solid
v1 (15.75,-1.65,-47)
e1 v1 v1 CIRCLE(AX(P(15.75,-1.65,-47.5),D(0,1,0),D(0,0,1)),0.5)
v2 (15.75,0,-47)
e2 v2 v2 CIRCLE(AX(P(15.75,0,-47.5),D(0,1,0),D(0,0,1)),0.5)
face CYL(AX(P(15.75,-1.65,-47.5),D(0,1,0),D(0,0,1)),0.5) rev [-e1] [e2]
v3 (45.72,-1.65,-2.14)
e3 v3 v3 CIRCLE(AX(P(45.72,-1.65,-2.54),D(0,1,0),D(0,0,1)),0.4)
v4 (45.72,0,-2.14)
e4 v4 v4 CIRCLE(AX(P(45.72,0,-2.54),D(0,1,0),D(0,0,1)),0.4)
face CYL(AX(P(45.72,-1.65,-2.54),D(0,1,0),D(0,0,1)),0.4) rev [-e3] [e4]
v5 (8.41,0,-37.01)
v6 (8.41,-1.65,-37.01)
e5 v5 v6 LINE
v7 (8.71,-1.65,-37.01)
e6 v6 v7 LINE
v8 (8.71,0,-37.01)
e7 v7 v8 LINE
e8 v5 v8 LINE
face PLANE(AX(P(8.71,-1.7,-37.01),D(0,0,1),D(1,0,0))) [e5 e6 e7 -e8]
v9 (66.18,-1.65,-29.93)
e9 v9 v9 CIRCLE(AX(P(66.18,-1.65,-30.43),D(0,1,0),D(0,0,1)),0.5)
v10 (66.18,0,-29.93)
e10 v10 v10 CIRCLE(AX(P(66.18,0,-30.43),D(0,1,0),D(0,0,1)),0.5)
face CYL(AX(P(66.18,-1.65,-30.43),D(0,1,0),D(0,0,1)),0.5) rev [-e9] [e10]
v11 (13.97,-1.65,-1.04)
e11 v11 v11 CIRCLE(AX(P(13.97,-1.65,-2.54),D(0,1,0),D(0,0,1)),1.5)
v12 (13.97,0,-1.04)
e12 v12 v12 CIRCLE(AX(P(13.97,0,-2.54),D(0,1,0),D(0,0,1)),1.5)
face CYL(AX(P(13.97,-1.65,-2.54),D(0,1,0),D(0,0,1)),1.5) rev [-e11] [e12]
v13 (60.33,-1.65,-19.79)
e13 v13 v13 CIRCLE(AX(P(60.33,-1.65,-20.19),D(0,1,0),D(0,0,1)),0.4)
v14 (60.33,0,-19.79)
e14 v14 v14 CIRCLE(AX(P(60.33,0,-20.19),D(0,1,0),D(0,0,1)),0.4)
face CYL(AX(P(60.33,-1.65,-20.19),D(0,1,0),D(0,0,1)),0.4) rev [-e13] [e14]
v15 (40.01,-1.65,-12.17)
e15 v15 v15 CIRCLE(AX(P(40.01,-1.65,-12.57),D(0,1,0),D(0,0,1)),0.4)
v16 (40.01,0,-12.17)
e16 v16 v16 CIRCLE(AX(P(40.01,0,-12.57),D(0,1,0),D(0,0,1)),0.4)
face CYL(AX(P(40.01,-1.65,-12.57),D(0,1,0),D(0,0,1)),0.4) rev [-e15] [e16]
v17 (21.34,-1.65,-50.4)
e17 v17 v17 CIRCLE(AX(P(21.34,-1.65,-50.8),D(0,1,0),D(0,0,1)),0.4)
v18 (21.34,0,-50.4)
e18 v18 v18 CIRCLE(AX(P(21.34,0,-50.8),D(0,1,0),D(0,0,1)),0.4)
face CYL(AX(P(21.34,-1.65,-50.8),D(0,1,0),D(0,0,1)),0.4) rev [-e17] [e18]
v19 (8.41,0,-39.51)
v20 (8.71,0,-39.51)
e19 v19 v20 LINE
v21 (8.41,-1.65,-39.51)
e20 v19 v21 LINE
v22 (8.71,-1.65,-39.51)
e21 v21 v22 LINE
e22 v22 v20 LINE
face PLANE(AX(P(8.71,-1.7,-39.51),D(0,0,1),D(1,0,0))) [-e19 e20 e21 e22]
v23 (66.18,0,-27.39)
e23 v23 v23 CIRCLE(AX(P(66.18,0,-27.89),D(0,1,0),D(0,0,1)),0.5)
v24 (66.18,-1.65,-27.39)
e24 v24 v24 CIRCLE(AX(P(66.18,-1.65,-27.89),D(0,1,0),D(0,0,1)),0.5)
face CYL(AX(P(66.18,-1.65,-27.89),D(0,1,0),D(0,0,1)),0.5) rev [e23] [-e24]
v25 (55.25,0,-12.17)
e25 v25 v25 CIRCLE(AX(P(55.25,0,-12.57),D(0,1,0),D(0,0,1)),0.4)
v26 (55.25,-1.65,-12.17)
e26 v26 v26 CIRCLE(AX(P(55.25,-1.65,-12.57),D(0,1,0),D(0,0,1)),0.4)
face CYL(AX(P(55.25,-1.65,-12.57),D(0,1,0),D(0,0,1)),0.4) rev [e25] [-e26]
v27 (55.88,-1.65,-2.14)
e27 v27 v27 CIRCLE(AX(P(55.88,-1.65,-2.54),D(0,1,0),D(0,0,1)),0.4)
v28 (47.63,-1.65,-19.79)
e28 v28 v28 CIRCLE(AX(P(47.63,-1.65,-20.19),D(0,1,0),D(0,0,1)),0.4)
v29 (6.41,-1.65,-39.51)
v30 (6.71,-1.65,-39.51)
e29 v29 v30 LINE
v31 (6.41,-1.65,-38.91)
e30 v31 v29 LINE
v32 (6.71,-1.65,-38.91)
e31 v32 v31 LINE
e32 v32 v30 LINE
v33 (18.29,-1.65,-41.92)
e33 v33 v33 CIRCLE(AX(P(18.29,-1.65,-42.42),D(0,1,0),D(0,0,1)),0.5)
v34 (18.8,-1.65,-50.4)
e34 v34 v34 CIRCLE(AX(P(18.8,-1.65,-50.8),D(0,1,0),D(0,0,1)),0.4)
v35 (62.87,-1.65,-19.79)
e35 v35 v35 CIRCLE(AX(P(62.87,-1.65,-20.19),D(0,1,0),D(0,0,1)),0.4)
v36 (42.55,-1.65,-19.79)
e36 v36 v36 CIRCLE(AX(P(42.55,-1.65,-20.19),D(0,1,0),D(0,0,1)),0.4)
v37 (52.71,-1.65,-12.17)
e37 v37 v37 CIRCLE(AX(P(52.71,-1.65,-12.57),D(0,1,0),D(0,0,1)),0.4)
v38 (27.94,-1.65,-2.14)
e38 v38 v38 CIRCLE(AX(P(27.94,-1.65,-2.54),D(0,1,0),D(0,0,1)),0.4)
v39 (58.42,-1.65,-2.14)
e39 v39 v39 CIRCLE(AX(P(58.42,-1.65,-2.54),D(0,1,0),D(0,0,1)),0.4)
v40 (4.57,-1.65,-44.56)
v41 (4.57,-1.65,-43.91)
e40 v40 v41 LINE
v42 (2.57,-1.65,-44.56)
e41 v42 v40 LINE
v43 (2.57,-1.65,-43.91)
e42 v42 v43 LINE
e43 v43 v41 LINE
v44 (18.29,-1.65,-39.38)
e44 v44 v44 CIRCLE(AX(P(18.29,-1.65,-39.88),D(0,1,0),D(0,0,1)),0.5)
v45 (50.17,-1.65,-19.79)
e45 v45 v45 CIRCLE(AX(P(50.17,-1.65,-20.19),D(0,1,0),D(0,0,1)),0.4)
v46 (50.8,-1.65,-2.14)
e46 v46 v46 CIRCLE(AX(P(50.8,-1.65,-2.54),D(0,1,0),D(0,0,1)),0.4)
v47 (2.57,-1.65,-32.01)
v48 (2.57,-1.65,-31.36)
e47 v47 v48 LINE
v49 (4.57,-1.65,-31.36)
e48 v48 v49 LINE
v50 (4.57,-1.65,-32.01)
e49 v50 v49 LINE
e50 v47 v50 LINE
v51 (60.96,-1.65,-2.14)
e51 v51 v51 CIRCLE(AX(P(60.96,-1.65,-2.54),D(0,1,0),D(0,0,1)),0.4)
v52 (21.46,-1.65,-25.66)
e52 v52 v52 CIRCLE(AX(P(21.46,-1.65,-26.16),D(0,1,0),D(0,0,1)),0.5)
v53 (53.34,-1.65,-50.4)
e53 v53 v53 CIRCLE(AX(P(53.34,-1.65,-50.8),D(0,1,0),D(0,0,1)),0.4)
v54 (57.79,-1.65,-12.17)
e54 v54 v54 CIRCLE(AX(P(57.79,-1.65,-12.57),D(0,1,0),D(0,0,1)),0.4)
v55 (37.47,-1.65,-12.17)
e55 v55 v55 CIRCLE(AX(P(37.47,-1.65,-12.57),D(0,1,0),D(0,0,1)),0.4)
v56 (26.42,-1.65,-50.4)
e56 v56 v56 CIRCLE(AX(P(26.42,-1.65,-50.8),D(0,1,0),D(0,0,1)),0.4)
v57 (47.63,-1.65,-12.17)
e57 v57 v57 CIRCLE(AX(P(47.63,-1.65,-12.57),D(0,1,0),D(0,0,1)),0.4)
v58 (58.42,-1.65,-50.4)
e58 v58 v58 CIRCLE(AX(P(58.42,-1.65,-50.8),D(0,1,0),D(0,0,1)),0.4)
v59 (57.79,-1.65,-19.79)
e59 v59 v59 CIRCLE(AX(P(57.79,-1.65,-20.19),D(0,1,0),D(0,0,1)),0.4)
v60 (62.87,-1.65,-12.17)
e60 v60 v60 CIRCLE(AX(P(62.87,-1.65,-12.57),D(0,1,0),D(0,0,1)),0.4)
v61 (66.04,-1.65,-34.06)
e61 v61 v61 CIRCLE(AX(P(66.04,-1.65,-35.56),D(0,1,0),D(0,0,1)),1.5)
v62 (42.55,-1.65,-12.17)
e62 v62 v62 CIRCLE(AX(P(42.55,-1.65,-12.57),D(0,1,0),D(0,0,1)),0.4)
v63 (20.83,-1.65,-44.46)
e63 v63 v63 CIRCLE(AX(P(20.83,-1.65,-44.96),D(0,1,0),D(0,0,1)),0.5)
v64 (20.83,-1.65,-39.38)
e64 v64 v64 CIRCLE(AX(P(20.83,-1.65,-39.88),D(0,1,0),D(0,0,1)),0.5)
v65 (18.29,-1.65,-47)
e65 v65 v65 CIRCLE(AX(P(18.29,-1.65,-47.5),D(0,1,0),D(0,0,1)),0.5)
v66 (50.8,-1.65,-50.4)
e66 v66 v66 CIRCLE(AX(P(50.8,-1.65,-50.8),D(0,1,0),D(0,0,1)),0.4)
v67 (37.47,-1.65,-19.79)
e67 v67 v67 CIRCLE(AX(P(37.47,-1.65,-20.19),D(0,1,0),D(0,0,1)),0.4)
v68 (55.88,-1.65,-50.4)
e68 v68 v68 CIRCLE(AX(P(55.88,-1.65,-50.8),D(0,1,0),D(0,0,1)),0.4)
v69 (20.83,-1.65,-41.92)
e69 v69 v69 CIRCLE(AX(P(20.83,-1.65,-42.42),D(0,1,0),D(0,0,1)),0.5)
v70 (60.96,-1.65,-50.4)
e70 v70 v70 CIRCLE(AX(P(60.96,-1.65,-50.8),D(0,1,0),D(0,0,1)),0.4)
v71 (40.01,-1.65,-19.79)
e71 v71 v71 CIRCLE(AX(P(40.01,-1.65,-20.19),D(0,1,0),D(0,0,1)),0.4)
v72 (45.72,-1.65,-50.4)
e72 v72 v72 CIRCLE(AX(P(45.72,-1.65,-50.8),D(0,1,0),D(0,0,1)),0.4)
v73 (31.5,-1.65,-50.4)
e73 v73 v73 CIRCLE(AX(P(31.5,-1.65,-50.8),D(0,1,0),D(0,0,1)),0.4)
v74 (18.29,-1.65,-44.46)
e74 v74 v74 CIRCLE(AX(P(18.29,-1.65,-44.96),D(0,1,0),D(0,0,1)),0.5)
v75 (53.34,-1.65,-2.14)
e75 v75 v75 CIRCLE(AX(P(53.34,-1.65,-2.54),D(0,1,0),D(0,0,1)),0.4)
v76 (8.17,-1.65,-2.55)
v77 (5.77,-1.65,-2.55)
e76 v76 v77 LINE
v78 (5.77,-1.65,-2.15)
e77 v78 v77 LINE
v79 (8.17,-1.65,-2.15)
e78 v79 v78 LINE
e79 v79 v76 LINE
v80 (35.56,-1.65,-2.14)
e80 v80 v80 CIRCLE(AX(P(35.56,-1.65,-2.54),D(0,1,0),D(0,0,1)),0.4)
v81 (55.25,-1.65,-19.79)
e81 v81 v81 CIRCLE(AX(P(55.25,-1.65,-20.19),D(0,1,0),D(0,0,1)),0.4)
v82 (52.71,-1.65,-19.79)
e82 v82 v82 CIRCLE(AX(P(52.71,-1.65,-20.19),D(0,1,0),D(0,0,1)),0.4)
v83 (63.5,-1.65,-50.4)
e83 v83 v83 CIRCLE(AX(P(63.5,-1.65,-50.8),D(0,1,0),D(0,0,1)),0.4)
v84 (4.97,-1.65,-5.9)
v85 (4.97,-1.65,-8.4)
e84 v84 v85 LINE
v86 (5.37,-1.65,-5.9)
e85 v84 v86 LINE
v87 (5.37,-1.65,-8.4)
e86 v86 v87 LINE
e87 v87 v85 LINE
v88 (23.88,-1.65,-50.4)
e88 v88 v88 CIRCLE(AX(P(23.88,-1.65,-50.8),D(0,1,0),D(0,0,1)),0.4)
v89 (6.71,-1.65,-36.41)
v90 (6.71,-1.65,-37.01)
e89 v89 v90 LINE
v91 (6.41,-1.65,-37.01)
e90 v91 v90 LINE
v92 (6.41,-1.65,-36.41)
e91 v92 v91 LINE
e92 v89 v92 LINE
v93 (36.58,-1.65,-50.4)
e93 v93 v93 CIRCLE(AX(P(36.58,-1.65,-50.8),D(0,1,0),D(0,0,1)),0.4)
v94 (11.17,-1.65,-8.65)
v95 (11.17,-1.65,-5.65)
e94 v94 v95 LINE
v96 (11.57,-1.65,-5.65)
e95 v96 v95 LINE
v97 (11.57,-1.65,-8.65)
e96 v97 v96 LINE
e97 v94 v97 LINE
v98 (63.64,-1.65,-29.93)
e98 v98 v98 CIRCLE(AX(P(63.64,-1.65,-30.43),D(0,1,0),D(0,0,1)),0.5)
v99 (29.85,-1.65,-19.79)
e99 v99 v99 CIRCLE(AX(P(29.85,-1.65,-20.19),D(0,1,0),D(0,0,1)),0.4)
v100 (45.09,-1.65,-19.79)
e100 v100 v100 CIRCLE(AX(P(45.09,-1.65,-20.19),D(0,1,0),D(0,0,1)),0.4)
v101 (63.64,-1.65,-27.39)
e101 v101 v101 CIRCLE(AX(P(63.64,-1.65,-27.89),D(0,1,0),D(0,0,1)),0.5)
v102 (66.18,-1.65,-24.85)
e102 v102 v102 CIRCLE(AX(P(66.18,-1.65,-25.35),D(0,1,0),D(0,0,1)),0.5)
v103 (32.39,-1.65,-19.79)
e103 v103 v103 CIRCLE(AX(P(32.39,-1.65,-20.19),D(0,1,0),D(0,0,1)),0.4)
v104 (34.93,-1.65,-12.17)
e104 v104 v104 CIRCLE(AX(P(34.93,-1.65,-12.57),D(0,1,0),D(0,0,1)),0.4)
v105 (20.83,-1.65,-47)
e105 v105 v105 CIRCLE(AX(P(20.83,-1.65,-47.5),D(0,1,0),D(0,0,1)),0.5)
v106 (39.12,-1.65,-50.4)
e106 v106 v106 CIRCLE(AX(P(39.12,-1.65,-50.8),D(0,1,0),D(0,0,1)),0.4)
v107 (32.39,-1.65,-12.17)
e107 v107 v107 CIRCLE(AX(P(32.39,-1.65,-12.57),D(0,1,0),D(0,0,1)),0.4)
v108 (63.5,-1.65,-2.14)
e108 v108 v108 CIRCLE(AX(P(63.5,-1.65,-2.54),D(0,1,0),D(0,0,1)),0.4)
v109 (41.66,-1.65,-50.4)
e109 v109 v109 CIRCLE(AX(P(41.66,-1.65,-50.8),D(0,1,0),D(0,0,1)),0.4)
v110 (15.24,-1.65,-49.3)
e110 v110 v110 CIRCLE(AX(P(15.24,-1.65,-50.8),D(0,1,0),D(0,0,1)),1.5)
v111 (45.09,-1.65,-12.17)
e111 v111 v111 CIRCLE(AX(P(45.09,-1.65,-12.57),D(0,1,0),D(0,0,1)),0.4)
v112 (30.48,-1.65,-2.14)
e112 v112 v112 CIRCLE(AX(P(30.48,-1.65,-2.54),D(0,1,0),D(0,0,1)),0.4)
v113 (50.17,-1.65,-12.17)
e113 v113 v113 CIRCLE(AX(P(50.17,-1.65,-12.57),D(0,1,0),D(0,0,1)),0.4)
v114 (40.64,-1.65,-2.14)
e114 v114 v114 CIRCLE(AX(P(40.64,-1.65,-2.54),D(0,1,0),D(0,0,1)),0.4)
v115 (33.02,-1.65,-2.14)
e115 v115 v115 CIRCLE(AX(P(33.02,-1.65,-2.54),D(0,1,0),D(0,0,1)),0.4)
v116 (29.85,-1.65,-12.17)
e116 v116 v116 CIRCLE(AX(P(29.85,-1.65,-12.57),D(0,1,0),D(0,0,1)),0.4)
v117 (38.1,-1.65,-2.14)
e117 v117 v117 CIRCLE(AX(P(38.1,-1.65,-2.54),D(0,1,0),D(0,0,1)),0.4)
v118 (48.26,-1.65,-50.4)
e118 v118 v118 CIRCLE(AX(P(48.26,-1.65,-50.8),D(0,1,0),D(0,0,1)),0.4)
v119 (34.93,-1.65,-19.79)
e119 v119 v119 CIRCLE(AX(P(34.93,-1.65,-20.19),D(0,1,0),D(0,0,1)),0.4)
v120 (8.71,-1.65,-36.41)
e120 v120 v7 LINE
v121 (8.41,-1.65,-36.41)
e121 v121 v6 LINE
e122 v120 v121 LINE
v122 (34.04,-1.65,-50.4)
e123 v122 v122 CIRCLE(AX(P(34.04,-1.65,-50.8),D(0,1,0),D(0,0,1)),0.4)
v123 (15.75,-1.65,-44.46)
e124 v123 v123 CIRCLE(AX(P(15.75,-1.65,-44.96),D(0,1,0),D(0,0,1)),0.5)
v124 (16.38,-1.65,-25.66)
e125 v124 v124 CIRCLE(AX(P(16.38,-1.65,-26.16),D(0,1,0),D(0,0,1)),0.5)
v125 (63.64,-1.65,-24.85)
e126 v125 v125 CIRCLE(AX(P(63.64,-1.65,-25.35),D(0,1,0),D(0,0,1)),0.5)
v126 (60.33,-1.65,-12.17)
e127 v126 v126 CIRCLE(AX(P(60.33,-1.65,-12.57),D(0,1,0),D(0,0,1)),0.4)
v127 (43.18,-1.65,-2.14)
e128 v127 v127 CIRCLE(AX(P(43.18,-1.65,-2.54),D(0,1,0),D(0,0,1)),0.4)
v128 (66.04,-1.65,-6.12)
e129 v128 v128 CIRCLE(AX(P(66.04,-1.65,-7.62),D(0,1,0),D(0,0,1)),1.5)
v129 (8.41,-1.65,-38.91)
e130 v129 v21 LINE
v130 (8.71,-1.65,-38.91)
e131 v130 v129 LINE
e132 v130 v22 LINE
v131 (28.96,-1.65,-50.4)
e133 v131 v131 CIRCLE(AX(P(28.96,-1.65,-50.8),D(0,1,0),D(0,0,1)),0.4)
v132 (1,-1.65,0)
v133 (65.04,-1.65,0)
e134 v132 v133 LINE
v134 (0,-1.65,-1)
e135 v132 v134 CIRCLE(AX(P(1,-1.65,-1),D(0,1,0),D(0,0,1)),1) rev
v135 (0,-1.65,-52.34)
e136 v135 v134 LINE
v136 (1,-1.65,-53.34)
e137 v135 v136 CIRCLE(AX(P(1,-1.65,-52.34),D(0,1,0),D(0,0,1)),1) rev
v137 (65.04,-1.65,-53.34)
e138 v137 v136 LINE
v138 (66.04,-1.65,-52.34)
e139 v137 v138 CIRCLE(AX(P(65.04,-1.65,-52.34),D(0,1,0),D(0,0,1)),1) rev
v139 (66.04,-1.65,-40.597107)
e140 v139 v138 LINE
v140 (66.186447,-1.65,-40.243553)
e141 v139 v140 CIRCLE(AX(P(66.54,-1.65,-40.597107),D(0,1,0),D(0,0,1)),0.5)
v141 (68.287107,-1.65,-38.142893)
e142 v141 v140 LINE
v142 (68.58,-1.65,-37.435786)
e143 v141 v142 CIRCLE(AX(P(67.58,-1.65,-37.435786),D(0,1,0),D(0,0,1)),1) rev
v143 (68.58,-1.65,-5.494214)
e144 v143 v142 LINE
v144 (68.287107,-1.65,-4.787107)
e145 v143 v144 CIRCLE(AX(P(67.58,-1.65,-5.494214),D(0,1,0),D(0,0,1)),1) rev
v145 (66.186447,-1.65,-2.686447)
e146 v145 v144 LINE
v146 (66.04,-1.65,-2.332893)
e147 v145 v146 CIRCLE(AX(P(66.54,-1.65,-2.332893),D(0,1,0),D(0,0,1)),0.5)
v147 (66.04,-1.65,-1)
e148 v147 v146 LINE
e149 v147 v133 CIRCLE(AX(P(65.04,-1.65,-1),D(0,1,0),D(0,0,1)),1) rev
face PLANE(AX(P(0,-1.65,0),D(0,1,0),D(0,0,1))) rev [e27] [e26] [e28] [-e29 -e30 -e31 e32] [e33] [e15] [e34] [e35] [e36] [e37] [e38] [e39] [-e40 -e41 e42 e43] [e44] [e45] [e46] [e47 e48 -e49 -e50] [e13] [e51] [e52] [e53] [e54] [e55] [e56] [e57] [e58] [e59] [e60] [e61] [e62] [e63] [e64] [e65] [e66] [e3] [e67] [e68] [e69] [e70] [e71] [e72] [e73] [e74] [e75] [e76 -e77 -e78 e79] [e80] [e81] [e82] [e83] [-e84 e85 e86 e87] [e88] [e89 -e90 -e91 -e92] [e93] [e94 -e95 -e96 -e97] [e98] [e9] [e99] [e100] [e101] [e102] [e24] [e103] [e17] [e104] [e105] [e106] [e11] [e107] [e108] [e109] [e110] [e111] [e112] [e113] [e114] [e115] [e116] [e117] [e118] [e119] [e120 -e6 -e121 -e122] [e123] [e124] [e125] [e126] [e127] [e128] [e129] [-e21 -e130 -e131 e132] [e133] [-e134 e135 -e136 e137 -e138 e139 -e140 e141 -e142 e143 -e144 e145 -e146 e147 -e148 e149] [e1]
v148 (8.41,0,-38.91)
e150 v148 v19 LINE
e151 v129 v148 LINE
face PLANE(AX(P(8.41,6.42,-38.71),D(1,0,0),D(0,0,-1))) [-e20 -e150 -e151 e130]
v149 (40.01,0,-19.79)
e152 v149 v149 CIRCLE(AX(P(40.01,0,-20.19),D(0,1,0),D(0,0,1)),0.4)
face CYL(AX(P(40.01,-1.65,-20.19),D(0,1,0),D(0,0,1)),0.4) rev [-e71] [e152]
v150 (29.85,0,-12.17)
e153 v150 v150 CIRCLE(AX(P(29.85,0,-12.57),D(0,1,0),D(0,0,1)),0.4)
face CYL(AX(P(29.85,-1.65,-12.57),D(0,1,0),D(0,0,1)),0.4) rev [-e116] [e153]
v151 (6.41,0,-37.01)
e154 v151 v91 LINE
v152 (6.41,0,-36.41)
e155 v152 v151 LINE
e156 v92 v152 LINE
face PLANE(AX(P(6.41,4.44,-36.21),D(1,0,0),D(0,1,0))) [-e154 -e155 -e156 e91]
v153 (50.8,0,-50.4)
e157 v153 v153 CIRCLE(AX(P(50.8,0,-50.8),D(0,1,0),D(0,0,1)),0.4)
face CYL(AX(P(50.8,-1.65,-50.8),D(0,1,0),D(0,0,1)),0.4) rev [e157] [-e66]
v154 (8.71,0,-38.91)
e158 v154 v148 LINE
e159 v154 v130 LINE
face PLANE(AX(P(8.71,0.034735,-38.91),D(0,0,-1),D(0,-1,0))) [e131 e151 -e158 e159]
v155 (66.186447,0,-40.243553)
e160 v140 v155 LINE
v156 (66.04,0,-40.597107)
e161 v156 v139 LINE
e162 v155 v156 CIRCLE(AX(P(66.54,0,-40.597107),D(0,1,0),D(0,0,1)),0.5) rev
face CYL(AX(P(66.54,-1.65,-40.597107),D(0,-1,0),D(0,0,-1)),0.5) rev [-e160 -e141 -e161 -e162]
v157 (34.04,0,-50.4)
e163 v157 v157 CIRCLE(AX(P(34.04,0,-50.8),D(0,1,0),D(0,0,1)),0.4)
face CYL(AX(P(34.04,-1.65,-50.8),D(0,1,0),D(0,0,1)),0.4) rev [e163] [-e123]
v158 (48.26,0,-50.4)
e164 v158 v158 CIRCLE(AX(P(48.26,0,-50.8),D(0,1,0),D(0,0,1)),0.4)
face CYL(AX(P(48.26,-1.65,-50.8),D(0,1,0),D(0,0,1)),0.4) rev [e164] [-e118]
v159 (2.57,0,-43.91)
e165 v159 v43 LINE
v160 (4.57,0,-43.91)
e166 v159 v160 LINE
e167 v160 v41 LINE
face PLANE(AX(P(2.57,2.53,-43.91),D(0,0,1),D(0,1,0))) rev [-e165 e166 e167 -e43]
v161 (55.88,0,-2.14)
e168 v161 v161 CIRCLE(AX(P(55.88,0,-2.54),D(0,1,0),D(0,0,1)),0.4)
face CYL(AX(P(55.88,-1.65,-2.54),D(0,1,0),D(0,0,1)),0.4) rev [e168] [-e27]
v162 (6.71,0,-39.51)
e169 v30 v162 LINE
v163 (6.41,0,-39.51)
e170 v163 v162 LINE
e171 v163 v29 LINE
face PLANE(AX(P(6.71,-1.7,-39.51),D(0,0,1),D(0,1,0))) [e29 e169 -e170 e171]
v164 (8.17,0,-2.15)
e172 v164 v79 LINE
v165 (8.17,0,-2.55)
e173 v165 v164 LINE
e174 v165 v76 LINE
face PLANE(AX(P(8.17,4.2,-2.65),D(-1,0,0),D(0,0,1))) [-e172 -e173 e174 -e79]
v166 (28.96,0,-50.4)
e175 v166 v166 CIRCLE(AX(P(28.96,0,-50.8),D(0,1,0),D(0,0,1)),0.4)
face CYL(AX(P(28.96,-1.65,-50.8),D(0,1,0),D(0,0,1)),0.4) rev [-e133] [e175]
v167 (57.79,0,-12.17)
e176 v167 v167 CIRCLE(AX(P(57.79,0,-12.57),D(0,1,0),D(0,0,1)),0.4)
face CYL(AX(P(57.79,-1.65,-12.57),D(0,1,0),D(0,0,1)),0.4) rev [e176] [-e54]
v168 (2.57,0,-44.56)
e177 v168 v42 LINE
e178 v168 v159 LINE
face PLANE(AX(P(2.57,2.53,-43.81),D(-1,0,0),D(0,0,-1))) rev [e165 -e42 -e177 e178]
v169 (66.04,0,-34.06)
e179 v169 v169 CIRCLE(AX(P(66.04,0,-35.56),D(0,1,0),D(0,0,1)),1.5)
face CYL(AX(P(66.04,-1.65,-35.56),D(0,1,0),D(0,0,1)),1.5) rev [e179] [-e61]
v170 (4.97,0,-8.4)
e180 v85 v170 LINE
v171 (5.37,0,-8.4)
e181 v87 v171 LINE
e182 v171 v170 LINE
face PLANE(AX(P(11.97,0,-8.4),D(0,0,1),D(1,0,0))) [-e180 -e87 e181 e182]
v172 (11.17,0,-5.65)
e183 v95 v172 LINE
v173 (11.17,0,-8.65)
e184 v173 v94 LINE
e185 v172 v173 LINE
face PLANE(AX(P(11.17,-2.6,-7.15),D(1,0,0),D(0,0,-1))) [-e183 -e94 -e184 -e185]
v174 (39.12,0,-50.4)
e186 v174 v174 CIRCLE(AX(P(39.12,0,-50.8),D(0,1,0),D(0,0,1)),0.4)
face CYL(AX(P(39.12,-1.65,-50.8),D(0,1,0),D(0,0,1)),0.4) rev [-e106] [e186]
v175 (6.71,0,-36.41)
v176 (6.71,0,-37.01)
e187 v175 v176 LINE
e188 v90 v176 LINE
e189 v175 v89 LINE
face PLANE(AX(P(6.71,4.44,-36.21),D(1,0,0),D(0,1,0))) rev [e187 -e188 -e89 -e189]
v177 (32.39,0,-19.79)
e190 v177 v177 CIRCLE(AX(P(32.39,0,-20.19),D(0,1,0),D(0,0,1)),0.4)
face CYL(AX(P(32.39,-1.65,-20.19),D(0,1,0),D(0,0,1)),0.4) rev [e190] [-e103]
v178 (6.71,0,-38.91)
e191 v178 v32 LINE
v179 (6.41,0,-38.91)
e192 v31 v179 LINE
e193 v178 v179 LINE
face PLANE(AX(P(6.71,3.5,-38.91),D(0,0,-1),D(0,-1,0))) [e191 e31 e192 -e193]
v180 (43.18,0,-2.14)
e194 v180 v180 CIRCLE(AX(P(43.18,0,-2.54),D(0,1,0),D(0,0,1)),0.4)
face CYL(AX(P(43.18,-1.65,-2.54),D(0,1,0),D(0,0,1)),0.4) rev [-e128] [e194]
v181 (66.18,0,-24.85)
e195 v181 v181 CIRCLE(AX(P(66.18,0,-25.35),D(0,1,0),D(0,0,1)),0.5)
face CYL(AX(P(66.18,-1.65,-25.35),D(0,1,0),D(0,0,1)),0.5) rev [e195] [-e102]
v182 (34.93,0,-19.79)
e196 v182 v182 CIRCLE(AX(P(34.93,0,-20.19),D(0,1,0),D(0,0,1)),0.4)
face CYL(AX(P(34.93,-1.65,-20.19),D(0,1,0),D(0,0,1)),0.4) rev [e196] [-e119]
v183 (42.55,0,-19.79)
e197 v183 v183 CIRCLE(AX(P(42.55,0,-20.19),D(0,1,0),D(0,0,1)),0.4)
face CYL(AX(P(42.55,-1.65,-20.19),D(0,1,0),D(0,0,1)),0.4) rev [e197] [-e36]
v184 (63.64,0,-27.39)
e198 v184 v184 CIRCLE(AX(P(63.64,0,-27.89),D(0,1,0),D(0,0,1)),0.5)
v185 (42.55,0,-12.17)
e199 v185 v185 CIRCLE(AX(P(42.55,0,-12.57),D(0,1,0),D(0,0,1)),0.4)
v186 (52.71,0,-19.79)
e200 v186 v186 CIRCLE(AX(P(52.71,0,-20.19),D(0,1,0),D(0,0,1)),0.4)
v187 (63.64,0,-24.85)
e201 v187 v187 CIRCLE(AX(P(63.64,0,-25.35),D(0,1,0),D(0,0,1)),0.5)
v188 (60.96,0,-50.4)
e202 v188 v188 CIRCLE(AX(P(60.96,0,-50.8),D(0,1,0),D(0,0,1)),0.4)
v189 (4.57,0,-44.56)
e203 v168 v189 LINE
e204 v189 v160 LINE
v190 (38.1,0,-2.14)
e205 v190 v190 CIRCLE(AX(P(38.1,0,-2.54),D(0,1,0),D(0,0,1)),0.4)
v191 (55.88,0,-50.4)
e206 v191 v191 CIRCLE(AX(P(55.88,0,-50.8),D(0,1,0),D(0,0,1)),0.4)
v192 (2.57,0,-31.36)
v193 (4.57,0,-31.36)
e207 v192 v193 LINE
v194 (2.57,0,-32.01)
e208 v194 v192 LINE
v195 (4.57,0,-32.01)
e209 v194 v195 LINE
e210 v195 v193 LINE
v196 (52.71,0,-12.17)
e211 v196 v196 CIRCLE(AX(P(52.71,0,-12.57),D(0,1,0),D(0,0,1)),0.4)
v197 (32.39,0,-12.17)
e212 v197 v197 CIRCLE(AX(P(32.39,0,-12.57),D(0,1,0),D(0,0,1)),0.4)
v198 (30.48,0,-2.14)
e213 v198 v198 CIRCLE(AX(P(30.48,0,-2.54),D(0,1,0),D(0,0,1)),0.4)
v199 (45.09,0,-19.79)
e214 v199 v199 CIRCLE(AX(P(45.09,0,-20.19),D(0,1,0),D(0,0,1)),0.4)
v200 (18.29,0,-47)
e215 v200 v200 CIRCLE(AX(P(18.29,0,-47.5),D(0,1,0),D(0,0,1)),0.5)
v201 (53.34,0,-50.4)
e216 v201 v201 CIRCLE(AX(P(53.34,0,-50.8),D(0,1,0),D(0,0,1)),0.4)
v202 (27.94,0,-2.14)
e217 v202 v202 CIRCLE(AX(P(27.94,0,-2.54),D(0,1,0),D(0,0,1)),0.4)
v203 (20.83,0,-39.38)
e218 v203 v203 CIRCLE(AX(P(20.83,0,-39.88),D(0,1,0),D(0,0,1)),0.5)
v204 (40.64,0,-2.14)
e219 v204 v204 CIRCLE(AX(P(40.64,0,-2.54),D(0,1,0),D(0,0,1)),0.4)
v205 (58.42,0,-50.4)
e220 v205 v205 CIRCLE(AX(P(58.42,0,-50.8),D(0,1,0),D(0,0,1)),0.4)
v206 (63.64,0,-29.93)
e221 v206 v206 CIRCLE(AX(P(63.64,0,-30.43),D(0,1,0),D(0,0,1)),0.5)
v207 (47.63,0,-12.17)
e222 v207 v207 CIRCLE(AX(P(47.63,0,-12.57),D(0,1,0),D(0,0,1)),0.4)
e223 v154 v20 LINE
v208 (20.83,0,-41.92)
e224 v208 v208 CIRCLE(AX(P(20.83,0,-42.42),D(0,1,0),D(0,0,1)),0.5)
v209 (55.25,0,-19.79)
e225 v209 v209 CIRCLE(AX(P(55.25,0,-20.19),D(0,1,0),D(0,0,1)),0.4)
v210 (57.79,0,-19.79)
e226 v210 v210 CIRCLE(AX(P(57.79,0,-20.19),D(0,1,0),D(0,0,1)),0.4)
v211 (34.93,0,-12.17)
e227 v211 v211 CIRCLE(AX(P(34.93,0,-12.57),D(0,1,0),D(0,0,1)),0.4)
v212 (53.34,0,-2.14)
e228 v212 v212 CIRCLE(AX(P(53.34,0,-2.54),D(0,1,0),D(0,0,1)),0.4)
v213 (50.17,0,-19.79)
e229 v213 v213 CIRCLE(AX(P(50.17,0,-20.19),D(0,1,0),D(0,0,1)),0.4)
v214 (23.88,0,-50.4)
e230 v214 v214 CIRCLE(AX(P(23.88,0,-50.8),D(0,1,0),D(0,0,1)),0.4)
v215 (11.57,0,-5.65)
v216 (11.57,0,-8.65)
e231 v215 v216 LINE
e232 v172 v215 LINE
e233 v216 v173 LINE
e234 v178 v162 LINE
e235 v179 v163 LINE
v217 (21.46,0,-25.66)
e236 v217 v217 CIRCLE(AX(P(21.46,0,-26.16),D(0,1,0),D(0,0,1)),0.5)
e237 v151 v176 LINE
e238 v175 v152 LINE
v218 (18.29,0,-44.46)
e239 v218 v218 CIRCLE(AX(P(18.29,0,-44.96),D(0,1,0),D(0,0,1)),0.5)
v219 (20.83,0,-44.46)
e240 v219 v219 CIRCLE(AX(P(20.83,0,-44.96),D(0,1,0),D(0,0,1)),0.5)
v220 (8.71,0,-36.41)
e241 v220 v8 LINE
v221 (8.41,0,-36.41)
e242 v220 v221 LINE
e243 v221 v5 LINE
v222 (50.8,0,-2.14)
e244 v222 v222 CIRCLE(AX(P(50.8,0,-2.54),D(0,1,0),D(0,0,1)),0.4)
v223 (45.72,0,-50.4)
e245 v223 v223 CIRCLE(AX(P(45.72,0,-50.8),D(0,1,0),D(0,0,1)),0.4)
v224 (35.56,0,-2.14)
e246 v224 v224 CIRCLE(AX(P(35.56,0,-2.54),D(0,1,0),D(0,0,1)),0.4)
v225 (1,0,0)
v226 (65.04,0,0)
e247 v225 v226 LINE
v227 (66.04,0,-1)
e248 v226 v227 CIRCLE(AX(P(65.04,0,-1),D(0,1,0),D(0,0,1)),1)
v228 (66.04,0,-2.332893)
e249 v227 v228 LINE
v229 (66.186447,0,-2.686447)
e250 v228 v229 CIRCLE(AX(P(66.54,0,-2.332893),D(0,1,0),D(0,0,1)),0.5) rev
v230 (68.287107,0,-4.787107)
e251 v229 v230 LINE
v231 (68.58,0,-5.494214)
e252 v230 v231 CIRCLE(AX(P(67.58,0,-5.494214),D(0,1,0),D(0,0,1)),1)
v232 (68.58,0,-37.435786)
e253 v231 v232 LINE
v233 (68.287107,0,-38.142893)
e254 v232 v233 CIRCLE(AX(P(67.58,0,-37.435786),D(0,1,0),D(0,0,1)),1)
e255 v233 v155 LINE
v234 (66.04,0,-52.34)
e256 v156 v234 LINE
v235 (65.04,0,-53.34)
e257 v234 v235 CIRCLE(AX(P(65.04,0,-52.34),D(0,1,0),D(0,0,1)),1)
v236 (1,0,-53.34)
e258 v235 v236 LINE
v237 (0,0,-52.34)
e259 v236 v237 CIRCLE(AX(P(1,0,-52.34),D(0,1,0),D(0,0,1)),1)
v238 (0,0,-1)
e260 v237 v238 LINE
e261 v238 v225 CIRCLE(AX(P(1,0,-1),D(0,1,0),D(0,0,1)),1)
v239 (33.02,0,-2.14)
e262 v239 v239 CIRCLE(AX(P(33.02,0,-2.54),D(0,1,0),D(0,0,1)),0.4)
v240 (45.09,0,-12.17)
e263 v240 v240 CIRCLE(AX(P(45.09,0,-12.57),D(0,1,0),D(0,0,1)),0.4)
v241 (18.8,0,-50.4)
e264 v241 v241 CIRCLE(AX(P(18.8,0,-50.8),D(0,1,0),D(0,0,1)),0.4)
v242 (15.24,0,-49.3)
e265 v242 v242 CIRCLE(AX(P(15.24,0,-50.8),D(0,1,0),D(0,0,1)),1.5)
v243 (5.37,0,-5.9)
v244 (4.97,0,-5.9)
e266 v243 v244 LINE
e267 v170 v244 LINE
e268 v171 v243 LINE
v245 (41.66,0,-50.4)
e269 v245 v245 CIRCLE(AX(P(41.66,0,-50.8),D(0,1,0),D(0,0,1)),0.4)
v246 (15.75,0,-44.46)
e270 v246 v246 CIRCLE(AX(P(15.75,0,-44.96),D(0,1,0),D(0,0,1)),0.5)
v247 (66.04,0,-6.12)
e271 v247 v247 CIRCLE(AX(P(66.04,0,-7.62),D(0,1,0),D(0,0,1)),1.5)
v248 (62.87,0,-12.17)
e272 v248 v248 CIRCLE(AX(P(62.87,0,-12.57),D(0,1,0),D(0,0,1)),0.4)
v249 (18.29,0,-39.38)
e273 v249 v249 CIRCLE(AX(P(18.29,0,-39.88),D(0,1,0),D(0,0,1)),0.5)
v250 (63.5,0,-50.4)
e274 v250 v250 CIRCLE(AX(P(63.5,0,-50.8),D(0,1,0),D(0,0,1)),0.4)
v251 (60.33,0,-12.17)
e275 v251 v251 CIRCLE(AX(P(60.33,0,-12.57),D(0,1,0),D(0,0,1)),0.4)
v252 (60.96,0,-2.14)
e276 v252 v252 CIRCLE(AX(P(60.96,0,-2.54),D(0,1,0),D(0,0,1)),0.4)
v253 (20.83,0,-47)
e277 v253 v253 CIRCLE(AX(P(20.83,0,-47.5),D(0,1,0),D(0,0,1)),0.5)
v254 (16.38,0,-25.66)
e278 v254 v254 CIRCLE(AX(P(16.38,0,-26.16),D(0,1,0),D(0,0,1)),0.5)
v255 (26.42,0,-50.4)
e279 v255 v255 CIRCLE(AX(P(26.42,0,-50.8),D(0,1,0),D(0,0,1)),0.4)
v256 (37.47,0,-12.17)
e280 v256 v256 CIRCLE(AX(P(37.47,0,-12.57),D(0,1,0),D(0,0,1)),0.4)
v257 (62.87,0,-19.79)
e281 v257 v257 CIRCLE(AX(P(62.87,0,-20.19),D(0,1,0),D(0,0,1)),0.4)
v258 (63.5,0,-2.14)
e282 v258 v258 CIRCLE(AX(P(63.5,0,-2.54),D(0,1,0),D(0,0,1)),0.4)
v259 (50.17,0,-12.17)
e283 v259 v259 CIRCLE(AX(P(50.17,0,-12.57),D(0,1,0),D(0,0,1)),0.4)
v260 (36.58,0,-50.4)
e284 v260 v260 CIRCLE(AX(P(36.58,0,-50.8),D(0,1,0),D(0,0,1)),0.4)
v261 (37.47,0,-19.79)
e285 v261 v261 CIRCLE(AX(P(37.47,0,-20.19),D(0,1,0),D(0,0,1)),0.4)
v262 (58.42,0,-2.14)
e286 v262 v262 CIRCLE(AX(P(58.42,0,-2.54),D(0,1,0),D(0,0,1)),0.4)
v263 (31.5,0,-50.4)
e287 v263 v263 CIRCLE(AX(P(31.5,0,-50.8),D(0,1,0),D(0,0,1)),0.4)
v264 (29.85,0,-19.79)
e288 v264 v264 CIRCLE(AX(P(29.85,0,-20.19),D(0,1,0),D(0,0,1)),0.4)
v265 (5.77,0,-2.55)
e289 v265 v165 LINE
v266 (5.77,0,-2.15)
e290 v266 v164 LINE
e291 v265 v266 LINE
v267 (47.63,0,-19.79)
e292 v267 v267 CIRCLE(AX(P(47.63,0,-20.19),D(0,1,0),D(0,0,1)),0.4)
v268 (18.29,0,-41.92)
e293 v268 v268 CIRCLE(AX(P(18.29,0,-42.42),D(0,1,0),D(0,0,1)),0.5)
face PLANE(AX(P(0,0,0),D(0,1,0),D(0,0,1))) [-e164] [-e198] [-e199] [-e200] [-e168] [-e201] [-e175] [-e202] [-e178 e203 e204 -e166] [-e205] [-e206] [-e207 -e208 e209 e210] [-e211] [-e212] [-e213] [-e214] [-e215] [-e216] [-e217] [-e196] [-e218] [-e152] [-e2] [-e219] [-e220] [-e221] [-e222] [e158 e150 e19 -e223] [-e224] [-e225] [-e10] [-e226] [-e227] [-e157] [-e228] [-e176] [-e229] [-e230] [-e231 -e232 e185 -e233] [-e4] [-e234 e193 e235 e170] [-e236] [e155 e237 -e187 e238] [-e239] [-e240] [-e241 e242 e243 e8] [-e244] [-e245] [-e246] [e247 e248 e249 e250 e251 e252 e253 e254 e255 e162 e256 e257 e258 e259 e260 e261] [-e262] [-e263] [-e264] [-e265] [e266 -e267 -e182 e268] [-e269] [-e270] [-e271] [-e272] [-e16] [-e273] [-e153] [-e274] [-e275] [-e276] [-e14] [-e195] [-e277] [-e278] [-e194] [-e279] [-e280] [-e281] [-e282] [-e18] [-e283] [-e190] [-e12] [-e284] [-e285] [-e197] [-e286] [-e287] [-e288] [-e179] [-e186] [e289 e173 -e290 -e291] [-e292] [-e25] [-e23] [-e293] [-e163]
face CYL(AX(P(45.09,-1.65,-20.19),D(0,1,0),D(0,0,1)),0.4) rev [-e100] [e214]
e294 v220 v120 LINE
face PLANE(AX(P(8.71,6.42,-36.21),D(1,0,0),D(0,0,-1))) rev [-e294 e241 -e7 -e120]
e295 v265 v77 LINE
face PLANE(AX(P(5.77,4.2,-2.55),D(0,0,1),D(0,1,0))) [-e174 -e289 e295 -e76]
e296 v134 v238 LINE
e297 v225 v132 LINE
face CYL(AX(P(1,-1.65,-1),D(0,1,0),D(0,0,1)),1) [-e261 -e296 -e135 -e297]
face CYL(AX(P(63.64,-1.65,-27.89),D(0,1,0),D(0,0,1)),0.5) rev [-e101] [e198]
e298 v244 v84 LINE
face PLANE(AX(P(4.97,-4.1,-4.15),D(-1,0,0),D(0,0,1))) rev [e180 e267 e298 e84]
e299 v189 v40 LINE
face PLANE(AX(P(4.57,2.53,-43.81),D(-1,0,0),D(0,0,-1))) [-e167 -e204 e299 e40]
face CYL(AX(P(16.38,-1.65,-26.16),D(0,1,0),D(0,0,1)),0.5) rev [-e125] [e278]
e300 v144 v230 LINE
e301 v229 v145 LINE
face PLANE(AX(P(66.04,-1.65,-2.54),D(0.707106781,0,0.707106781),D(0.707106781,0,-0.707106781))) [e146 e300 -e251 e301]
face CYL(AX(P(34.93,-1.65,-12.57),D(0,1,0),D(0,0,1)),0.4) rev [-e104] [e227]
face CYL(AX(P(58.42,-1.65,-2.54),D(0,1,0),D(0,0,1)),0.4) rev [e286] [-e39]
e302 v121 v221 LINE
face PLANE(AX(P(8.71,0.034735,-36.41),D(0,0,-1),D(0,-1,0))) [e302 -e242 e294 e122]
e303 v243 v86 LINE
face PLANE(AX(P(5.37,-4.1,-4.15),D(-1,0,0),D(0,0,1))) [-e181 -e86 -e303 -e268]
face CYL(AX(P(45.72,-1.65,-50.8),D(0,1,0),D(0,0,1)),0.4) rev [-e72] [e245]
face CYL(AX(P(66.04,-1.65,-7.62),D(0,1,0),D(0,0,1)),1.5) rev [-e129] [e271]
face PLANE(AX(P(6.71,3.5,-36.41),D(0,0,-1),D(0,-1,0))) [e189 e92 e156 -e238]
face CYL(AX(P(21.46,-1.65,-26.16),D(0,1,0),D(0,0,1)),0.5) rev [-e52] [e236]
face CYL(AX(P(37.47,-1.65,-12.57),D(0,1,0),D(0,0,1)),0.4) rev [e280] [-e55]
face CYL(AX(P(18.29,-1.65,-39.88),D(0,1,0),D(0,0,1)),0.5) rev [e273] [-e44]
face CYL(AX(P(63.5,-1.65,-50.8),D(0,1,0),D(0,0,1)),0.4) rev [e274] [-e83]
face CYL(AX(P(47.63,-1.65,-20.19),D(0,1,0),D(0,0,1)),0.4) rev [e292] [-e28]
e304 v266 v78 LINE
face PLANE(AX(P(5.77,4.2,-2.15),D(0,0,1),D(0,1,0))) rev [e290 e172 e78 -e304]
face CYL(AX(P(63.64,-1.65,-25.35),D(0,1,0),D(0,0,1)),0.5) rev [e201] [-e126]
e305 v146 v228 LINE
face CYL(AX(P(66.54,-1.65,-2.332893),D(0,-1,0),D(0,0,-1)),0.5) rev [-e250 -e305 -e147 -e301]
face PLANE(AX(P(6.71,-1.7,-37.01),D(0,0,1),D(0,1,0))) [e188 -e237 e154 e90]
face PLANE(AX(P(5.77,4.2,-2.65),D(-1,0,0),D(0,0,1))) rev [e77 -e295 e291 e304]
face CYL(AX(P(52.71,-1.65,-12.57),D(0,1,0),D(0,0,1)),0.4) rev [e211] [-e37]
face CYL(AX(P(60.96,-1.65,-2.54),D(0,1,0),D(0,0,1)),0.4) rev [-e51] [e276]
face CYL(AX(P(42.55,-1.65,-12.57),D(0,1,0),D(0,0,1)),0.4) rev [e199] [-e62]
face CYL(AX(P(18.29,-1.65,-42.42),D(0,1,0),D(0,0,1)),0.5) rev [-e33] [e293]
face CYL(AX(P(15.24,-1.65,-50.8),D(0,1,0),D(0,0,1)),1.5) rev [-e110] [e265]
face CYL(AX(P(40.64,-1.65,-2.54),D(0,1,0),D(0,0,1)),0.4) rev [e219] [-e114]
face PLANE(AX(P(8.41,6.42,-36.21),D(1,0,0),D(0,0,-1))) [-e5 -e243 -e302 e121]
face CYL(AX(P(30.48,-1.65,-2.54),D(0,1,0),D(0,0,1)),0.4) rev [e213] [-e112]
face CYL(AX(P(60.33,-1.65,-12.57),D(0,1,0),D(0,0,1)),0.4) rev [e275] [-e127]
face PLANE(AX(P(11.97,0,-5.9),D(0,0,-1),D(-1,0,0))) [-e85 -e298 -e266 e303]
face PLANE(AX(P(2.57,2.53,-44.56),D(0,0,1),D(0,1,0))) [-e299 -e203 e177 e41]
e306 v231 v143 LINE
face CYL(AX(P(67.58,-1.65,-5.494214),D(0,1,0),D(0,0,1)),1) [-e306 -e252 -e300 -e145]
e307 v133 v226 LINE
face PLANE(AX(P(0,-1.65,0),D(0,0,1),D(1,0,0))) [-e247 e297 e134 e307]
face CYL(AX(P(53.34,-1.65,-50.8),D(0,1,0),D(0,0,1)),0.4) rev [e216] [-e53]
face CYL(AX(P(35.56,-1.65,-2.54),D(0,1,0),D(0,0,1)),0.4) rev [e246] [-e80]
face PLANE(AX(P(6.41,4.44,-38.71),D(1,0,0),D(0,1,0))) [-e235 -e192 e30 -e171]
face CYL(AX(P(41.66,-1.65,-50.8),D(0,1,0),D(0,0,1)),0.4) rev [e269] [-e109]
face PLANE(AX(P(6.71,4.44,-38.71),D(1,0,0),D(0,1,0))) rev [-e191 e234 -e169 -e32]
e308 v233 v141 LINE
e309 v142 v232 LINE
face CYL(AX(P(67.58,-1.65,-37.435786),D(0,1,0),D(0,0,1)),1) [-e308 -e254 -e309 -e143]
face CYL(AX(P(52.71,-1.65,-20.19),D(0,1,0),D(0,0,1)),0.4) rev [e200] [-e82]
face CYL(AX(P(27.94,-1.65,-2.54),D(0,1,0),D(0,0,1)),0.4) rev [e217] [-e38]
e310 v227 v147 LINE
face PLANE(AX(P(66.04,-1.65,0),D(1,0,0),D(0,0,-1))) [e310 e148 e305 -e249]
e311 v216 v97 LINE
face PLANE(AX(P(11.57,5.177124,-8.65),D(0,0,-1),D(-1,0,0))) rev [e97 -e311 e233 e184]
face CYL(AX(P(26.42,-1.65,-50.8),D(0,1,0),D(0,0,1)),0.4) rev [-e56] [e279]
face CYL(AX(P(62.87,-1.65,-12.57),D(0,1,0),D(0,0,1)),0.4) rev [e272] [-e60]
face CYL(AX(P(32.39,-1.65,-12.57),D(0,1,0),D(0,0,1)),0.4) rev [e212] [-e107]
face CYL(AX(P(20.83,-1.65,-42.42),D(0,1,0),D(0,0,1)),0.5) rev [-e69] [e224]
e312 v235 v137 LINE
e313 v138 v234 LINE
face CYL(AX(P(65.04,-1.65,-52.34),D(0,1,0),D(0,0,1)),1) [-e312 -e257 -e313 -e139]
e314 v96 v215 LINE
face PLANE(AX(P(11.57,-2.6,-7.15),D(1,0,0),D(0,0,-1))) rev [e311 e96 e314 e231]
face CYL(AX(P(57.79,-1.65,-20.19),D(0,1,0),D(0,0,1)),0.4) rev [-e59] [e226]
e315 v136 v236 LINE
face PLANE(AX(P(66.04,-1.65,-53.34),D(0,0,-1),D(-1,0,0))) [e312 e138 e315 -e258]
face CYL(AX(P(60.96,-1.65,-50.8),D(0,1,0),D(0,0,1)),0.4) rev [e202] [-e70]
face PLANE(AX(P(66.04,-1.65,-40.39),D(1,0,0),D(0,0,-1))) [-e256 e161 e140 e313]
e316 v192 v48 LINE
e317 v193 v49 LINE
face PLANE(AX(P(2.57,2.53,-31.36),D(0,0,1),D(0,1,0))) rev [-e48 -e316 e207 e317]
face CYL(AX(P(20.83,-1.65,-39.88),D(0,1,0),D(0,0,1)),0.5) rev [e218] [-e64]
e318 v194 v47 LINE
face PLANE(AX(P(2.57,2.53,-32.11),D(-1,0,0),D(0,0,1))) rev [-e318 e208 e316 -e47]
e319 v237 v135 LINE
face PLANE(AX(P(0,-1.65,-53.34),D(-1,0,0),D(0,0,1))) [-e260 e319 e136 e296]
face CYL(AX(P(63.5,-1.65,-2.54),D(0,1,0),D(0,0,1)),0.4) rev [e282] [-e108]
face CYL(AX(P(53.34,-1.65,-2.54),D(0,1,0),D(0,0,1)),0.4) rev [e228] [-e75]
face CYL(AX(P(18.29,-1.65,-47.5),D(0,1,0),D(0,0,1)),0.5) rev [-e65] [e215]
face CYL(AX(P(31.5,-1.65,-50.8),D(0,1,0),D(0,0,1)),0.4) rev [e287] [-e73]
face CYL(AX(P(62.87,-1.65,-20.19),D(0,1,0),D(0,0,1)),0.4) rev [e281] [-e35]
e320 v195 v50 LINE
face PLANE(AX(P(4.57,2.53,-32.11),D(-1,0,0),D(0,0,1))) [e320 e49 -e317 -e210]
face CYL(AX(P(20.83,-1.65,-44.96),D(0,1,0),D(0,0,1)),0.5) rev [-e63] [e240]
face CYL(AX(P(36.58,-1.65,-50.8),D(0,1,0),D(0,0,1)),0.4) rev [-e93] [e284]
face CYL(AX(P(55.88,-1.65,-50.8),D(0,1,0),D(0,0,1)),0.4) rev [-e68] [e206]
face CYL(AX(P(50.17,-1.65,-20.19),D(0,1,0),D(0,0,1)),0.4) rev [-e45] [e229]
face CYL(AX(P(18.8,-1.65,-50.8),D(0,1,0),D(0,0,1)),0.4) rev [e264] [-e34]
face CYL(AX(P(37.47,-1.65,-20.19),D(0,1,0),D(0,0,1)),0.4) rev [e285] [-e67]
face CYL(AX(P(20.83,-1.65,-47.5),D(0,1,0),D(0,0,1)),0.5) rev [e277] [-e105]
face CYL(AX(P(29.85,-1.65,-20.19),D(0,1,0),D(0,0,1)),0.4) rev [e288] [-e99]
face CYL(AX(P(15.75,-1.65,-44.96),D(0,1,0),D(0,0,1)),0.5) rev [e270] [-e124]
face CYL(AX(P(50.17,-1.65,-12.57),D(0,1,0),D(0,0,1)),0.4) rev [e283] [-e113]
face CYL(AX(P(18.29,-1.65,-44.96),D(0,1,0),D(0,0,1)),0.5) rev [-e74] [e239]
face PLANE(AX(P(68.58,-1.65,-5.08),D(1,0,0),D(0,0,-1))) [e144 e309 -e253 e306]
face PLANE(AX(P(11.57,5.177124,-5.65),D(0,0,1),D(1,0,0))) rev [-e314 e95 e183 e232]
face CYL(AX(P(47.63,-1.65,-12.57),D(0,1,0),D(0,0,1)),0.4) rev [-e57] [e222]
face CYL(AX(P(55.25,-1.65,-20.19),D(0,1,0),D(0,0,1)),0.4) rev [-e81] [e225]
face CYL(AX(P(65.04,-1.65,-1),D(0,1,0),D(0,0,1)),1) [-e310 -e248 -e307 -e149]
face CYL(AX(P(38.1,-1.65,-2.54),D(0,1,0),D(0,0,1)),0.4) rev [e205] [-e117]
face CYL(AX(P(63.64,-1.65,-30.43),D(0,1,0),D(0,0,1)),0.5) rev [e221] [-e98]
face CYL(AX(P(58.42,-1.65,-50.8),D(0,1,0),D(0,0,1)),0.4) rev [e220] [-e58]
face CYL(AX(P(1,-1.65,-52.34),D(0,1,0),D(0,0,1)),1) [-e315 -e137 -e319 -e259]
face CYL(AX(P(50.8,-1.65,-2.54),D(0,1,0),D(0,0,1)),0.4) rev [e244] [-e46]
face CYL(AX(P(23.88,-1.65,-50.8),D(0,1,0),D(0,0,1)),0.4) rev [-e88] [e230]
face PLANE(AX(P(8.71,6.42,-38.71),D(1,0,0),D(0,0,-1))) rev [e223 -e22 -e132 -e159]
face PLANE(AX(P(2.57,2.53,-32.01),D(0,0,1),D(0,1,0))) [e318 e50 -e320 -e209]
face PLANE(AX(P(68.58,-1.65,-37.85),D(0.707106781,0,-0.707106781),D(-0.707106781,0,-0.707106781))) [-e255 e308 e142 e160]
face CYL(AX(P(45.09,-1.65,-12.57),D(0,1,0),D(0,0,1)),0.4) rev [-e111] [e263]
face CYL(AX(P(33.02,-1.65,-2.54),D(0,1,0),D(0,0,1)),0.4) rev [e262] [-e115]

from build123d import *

# Parameters (mm, degrees)
SKETCH1_R           = 1.5
BOSS_EXTRUDE1_DEPTH = 1.65
FILLET1_R           = 1
FILLET2_R           = 0.5
SKETCH2_R           = 0.4
CUT_EXTRUDE1_DEPTH  = 87.897033896
LPATTERN1_COUNT     = 15
LPATTERN1_PITCH     = 2.54
SKETCH3_R           = 0.4
CUT_EXTRUDE2_DEPTH  = 87.897033896
LPATTERN2_COUNT     = 10
LPATTERN2_PITCH     = 2.54
SKETCH4_R           = 0.4
CUT_EXTRUDE3_DEPTH  = 87.897033896
LPATTERN3_COUNT     = 8
LPATTERN3_PITCH     = 2.54
SKETCH5_R           = 0.5
CUT_EXTRUDE4_DEPTH  = 87.897033896
SKETCH6_R           = 0.4
CUT_EXTRUDE5_DEPTH  = 87.897033896
INDENT1_START       = 11.17
INDENT1_OUTLINE_W   = 1.65
INDENT1_OUTLINE_H   = 3
INDENT1_DEPTH       = 0.4
INDENT1_START_2     = 4.97
INDENT1_2_OUTLINE_W = 1.65
INDENT1_2_OUTLINE_H = 2.5
INDENT1_2_DEPTH     = 0.4
INDENT1_START_3     = 5.77
INDENT1_3_OUTLINE_W = 1.65
INDENT1_3_OUTLINE_H = 0.4
INDENT1_3_DEPTH     = 2.4
INDENT2_START       = 2.57
INDENT2_OUTLINE_W   = 1.65
INDENT2_OUTLINE_H   = 0.65
INDENT2_DEPTH       = 2
INDENT2_START_2     = 6.41
INDENT2_2_OUTLINE_W = 1.65
INDENT2_2_OUTLINE_H = 0.6
INDENT2_2_DEPTH     = 0.3
INDENT2_START_3     = 8.41
INDENT2_3_OUTLINE_W = 1.65
INDENT2_3_OUTLINE_H = 0.6
INDENT2_3_DEPTH     = 0.3
INDENT3_START       = 6.41
INDENT3_OUTLINE_W   = 1.65
INDENT3_OUTLINE_H   = 0.6
INDENT3_DEPTH       = 0.3
INDENT3_START_2     = 8.41
INDENT3_2_OUTLINE_W = 1.65
INDENT3_2_OUTLINE_H = 0.6
INDENT3_2_DEPTH     = 0.3


# Read off the part's stored shape, not the designer's step: Indent1, Indent2, Indent3
with BuildPart() as part:
    # Sketch1 → Boss-Extrude1 (new body)
    with BuildSketch(Plane(origin=(0, 0, 0), x_dir=(1, 0, 0), z_dir=(0, 1, 0))):
        Polygon((0, 0), (66.04, 0), (66.04, 2.54), (68.58, 5.08), (68.58, 37.85), (66.04, 40.39), (66.04, 53.34), (0, 53.34), align=None)
        with Locations(Location((15.24, 50.8, 0), (0, 0, 270))):
            Circle(SKETCH1_R, mode=Mode.SUBTRACT)
        with Locations(Location((66.04, 7.62, 0), (0, 0, 270))):
            Circle(SKETCH1_R, mode=Mode.SUBTRACT)
        with Locations(Location((13.97, 2.54, 0), (0, 0, 270))):
            Circle(SKETCH1_R, mode=Mode.SUBTRACT)
        with Locations(Location((66.04, 35.56, 0), (0, 0, 270))):
            Circle(SKETCH1_R, mode=Mode.SUBTRACT)
    extrude(amount=-BOSS_EXTRUDE1_DEPTH)

    # Fillet1
    fillet1_edges = [part.edges().sort_by_distance(p)[0] for p in [
        (0, -0.825, -53.34),
        (66.04, -0.825, -53.34),
        (68.58, -0.825, -37.85),
        (68.58, -0.825, -5.08),
        (66.04, -0.825, 0),
        (0, -0.825, 0),
    ]]
    fillet(fillet1_edges, radius=FILLET1_R)

    # Fillet2
    fillet2_edges = [part.edges().sort_by_distance(p)[0] for p in [
        (66.04, -0.825, -40.39),
        (66.04, -0.825, -2.54),
    ]]
    fillet(fillet2_edges, radius=FILLET2_R)

    # Sketch2 → Cut-Extrude1 (cut, through all)
    with BuildSketch(Plane(origin=(0, 0, 0), x_dir=(1, 0, 0), z_dir=(0, 1, 0))):
        with Locations(Location((27.94, 2.54, 0), (0, 0, 270))):
            Circle(SKETCH2_R)
    cut_extrude1 = extrude(amount=-CUT_EXTRUDE1_DEPTH, mode=Mode.SUBTRACT)

    # LPattern1: Cut-Extrude1 ×15, 1 skipped
    with Locations(*[(i * LPATTERN1_PITCH, 0, 0) for i in range(1, LPATTERN1_COUNT) if i not in (8,)]):
        add(cut_extrude1, mode=Mode.SUBTRACT)

    # Sketch3 → Cut-Extrude2 (cut, through all)
    with BuildSketch(Plane(origin=(0, 0, 0), x_dir=(1, 0, 0), z_dir=(0, 1, 0))):
        with Locations(Location((18.8, 50.8, 0), (0, 0, 270))):
            Circle(SKETCH3_R)
    cut_extrude2 = extrude(amount=-CUT_EXTRUDE2_DEPTH, mode=Mode.SUBTRACT)

    # LPattern2: Cut-Extrude2 ×10
    with Locations(*[(i * LPATTERN2_PITCH, 0, 0) for i in range(1, LPATTERN2_COUNT)]):
        add(cut_extrude2, mode=Mode.SUBTRACT)

    # Sketch4 → Cut-Extrude3 (cut, through all)
    with BuildSketch(Plane(origin=(0, 0, 0), x_dir=(1, 0, 0), z_dir=(0, 1, 0))):
        with Locations(Location((45.72, 50.8, 0), (0, 0, 270))):
            Circle(SKETCH4_R)
    cut_extrude3 = extrude(amount=-CUT_EXTRUDE3_DEPTH, mode=Mode.SUBTRACT)

    # LPattern3: Cut-Extrude3 ×8
    with Locations(*[(i * LPATTERN3_PITCH, 0, 0) for i in range(1, LPATTERN3_COUNT)]):
        add(cut_extrude3, mode=Mode.SUBTRACT)

    # Sketch5 → Cut-Extrude4 (cut, through all)
    with BuildSketch(Plane(origin=(0, 0, 0), x_dir=(1, 0, 0), z_dir=(0, 1, 0))):
        with Locations(Location((15.75, 47.5, 0), (0, 0, 270))):
            Circle(SKETCH5_R)
        with Locations(Location((18.29, 47.5, 0), (0, 0, 270))):
            Circle(SKETCH5_R)
        with Locations(Location((20.83, 47.5, 0), (0, 0, 270))):
            Circle(SKETCH5_R)
        with Locations(Location((15.75, 44.96, 0), (0, 0, 270))):
            Circle(SKETCH5_R)
        with Locations(Location((18.29, 44.96, 0), (0, 0, 270))):
            Circle(SKETCH5_R)
        with Locations(Location((20.83, 44.96, 0), (0, 0, 270))):
            Circle(SKETCH5_R)
        with Locations(Location((18.29, 42.42, 0), (0, 0, 270))):
            Circle(SKETCH5_R)
        with Locations(Location((20.83, 42.42, 0), (0, 0, 270))):
            Circle(SKETCH5_R)
        with Locations(Location((18.29, 39.88, 0), (0, 0, 270))):
            Circle(SKETCH5_R)
        with Locations(Location((20.83, 39.88, 0), (0, 0, 270))):
            Circle(SKETCH5_R)
        with Locations(Location((16.38, 26.16, 0), (0, 0, 270))):
            Circle(SKETCH5_R)
        with Locations(Location((21.46, 26.16, 0), (0, 0, 270))):
            Circle(SKETCH5_R)
        with Locations(Location((63.64, 30.43, 0), (0, 0, 270))):
            Circle(SKETCH5_R)
        with Locations(Location((63.64, 27.89, 0), (0, 0, 270))):
            Circle(SKETCH5_R)
        with Locations(Location((63.64, 25.35, 0), (0, 0, 270))):
            Circle(SKETCH5_R)
        with Locations(Location((66.18, 25.35, 0), (0, 0, 270))):
            Circle(SKETCH5_R)
        with Locations(Location((66.18, 27.89, 0), (0, 0, 270))):
            Circle(SKETCH5_R)
        with Locations(Location((66.18, 30.43, 0), (0, 0, 270))):
            Circle(SKETCH5_R)
    extrude(amount=-CUT_EXTRUDE4_DEPTH, mode=Mode.SUBTRACT)

    # Sketch6 → Cut-Extrude5 (cut, through all)
    with BuildSketch(Plane(origin=(0, 0, 0), x_dir=(1, 0, 0), z_dir=(0, 1, 0))):
        with Locations(Location((29.85, 12.57, 0), (0, 0, 270))):
            Circle(SKETCH6_R)
        with Locations(Location((32.39, 12.57, 0), (0, 0, 270))):
            Circle(SKETCH6_R)
        with Locations(Location((34.93, 12.57, 0), (0, 0, 270))):
            Circle(SKETCH6_R)
        with Locations(Location((37.47, 12.57, 0), (0, 0, 270))):
            Circle(SKETCH6_R)
        with Locations(Location((40.01, 12.57, 0), (0, 0, 270))):
            Circle(SKETCH6_R)
        with Locations(Location((42.55, 12.57, 0), (0, 0, 270))):
            Circle(SKETCH6_R)
        with Locations(Location((45.09, 12.57, 0), (0, 0, 270))):
            Circle(SKETCH6_R)
        with Locations(Location((47.63, 12.57, 0), (0, 0, 270))):
            Circle(SKETCH6_R)
        with Locations(Location((50.17, 12.57, 0), (0, 0, 270))):
            Circle(SKETCH6_R)
        with Locations(Location((52.71, 12.57, 0), (0, 0, 270))):
            Circle(SKETCH6_R)
        with Locations(Location((55.25, 12.57, 0), (0, 0, 270))):
            Circle(SKETCH6_R)
        with Locations(Location((57.79, 12.57, 0), (0, 0, 270))):
            Circle(SKETCH6_R)
        with Locations(Location((60.33, 12.57, 0), (0, 0, 270))):
            Circle(SKETCH6_R)
        with Locations(Location((62.87, 12.57, 0), (0, 0, 270))):
            Circle(SKETCH6_R)
        with Locations(Location((29.85, 20.19, 0), (0, 0, 270))):
            Circle(SKETCH6_R)
        with Locations(Location((32.39, 20.19, 0), (0, 0, 270))):
            Circle(SKETCH6_R)
        with Locations(Location((34.93, 20.19, 0), (0, 0, 270))):
            Circle(SKETCH6_R)
        with Locations(Location((37.47, 20.19, 0), (0, 0, 270))):
            Circle(SKETCH6_R)
        with Locations(Location((40.01, 20.19, 0), (0, 0, 270))):
            Circle(SKETCH6_R)
        with Locations(Location((42.55, 20.19, 0), (0, 0, 270))):
            Circle(SKETCH6_R)
        with Locations(Location((45.09, 20.19, 0), (0, 0, 270))):
            Circle(SKETCH6_R)
        with Locations(Location((47.63, 20.19, 0), (0, 0, 270))):
            Circle(SKETCH6_R)
        with Locations(Location((50.17, 20.19, 0), (0, 0, 270))):
            Circle(SKETCH6_R)
        with Locations(Location((52.71, 20.19, 0), (0, 0, 270))):
            Circle(SKETCH6_R)
        with Locations(Location((55.25, 20.19, 0), (0, 0, 270))):
            Circle(SKETCH6_R)
        with Locations(Location((57.79, 20.19, 0), (0, 0, 270))):
            Circle(SKETCH6_R)
        with Locations(Location((60.33, 20.19, 0), (0, 0, 270))):
            Circle(SKETCH6_R)
        with Locations(Location((62.87, 20.19, 0), (0, 0, 270))):
            Circle(SKETCH6_R)
    extrude(amount=-CUT_EXTRUDE5_DEPTH, mode=Mode.SUBTRACT)

    # Indent1 outline → Indent1 (cut)
    with BuildSketch(Plane.YZ.offset(INDENT1_START)):
        with Locations((-0.825, -7.15)):
            Rectangle(INDENT1_OUTLINE_W, INDENT1_OUTLINE_H)
    extrude(amount=INDENT1_DEPTH, mode=Mode.SUBTRACT)

    # Indent1 2 outline → Indent1 2 (cut)
    with BuildSketch(Plane.YZ.offset(INDENT1_START_2)):
        with Locations((-0.825, -7.15)):
            Rectangle(INDENT1_2_OUTLINE_W, INDENT1_2_OUTLINE_H)
    extrude(amount=INDENT1_2_DEPTH, mode=Mode.SUBTRACT)

    # Indent1 3 outline → Indent1 3 (cut)
    with BuildSketch(Plane.YZ.offset(INDENT1_START_3)):
        with Locations((-0.825, -2.35)):
            Rectangle(INDENT1_3_OUTLINE_W, INDENT1_3_OUTLINE_H)
    extrude(amount=INDENT1_3_DEPTH, mode=Mode.SUBTRACT)

    # Indent2 outline → Indent2 (cut)
    with BuildSketch(Plane.YZ.offset(INDENT2_START)):
        with Locations((-0.825, -31.685)):
            Rectangle(INDENT2_OUTLINE_W, INDENT2_OUTLINE_H)
        with Locations((-0.825, -44.235)):
            Rectangle(INDENT2_OUTLINE_W, INDENT2_OUTLINE_H)
    extrude(amount=INDENT2_DEPTH, mode=Mode.SUBTRACT)

    # Indent2 2 outline → Indent2 2 (cut)
    with BuildSketch(Plane.YZ.offset(INDENT2_START_2)):
        with Locations((-0.825, -36.71)):
            Rectangle(INDENT2_2_OUTLINE_W, INDENT2_2_OUTLINE_H)
    extrude(amount=INDENT2_2_DEPTH, mode=Mode.SUBTRACT)

    # Indent2 3 outline → Indent2 3 (cut)
    with BuildSketch(Plane.YZ.offset(INDENT2_START_3)):
        with Locations((-0.825, -36.71)):
            Rectangle(INDENT2_3_OUTLINE_W, INDENT2_3_OUTLINE_H)
    extrude(amount=INDENT2_3_DEPTH, mode=Mode.SUBTRACT)

    # Indent3 outline → Indent3 (cut)
    with BuildSketch(Plane.YZ.offset(INDENT3_START)):
        with Locations((-0.825, -39.21)):
            Rectangle(INDENT3_OUTLINE_W, INDENT3_OUTLINE_H)
    extrude(amount=INDENT3_DEPTH, mode=Mode.SUBTRACT)

    # Indent3 2 outline → Indent3 2 (cut)
    with BuildSketch(Plane.YZ.offset(INDENT3_START_2)):
        with Locations((-0.825, -39.21)):
            Rectangle(INDENT3_2_OUTLINE_W, INDENT3_2_OUTLINE_H)
    extrude(amount=INDENT3_2_DEPTH, mode=Mode.SUBTRACT)


solid = part.part
